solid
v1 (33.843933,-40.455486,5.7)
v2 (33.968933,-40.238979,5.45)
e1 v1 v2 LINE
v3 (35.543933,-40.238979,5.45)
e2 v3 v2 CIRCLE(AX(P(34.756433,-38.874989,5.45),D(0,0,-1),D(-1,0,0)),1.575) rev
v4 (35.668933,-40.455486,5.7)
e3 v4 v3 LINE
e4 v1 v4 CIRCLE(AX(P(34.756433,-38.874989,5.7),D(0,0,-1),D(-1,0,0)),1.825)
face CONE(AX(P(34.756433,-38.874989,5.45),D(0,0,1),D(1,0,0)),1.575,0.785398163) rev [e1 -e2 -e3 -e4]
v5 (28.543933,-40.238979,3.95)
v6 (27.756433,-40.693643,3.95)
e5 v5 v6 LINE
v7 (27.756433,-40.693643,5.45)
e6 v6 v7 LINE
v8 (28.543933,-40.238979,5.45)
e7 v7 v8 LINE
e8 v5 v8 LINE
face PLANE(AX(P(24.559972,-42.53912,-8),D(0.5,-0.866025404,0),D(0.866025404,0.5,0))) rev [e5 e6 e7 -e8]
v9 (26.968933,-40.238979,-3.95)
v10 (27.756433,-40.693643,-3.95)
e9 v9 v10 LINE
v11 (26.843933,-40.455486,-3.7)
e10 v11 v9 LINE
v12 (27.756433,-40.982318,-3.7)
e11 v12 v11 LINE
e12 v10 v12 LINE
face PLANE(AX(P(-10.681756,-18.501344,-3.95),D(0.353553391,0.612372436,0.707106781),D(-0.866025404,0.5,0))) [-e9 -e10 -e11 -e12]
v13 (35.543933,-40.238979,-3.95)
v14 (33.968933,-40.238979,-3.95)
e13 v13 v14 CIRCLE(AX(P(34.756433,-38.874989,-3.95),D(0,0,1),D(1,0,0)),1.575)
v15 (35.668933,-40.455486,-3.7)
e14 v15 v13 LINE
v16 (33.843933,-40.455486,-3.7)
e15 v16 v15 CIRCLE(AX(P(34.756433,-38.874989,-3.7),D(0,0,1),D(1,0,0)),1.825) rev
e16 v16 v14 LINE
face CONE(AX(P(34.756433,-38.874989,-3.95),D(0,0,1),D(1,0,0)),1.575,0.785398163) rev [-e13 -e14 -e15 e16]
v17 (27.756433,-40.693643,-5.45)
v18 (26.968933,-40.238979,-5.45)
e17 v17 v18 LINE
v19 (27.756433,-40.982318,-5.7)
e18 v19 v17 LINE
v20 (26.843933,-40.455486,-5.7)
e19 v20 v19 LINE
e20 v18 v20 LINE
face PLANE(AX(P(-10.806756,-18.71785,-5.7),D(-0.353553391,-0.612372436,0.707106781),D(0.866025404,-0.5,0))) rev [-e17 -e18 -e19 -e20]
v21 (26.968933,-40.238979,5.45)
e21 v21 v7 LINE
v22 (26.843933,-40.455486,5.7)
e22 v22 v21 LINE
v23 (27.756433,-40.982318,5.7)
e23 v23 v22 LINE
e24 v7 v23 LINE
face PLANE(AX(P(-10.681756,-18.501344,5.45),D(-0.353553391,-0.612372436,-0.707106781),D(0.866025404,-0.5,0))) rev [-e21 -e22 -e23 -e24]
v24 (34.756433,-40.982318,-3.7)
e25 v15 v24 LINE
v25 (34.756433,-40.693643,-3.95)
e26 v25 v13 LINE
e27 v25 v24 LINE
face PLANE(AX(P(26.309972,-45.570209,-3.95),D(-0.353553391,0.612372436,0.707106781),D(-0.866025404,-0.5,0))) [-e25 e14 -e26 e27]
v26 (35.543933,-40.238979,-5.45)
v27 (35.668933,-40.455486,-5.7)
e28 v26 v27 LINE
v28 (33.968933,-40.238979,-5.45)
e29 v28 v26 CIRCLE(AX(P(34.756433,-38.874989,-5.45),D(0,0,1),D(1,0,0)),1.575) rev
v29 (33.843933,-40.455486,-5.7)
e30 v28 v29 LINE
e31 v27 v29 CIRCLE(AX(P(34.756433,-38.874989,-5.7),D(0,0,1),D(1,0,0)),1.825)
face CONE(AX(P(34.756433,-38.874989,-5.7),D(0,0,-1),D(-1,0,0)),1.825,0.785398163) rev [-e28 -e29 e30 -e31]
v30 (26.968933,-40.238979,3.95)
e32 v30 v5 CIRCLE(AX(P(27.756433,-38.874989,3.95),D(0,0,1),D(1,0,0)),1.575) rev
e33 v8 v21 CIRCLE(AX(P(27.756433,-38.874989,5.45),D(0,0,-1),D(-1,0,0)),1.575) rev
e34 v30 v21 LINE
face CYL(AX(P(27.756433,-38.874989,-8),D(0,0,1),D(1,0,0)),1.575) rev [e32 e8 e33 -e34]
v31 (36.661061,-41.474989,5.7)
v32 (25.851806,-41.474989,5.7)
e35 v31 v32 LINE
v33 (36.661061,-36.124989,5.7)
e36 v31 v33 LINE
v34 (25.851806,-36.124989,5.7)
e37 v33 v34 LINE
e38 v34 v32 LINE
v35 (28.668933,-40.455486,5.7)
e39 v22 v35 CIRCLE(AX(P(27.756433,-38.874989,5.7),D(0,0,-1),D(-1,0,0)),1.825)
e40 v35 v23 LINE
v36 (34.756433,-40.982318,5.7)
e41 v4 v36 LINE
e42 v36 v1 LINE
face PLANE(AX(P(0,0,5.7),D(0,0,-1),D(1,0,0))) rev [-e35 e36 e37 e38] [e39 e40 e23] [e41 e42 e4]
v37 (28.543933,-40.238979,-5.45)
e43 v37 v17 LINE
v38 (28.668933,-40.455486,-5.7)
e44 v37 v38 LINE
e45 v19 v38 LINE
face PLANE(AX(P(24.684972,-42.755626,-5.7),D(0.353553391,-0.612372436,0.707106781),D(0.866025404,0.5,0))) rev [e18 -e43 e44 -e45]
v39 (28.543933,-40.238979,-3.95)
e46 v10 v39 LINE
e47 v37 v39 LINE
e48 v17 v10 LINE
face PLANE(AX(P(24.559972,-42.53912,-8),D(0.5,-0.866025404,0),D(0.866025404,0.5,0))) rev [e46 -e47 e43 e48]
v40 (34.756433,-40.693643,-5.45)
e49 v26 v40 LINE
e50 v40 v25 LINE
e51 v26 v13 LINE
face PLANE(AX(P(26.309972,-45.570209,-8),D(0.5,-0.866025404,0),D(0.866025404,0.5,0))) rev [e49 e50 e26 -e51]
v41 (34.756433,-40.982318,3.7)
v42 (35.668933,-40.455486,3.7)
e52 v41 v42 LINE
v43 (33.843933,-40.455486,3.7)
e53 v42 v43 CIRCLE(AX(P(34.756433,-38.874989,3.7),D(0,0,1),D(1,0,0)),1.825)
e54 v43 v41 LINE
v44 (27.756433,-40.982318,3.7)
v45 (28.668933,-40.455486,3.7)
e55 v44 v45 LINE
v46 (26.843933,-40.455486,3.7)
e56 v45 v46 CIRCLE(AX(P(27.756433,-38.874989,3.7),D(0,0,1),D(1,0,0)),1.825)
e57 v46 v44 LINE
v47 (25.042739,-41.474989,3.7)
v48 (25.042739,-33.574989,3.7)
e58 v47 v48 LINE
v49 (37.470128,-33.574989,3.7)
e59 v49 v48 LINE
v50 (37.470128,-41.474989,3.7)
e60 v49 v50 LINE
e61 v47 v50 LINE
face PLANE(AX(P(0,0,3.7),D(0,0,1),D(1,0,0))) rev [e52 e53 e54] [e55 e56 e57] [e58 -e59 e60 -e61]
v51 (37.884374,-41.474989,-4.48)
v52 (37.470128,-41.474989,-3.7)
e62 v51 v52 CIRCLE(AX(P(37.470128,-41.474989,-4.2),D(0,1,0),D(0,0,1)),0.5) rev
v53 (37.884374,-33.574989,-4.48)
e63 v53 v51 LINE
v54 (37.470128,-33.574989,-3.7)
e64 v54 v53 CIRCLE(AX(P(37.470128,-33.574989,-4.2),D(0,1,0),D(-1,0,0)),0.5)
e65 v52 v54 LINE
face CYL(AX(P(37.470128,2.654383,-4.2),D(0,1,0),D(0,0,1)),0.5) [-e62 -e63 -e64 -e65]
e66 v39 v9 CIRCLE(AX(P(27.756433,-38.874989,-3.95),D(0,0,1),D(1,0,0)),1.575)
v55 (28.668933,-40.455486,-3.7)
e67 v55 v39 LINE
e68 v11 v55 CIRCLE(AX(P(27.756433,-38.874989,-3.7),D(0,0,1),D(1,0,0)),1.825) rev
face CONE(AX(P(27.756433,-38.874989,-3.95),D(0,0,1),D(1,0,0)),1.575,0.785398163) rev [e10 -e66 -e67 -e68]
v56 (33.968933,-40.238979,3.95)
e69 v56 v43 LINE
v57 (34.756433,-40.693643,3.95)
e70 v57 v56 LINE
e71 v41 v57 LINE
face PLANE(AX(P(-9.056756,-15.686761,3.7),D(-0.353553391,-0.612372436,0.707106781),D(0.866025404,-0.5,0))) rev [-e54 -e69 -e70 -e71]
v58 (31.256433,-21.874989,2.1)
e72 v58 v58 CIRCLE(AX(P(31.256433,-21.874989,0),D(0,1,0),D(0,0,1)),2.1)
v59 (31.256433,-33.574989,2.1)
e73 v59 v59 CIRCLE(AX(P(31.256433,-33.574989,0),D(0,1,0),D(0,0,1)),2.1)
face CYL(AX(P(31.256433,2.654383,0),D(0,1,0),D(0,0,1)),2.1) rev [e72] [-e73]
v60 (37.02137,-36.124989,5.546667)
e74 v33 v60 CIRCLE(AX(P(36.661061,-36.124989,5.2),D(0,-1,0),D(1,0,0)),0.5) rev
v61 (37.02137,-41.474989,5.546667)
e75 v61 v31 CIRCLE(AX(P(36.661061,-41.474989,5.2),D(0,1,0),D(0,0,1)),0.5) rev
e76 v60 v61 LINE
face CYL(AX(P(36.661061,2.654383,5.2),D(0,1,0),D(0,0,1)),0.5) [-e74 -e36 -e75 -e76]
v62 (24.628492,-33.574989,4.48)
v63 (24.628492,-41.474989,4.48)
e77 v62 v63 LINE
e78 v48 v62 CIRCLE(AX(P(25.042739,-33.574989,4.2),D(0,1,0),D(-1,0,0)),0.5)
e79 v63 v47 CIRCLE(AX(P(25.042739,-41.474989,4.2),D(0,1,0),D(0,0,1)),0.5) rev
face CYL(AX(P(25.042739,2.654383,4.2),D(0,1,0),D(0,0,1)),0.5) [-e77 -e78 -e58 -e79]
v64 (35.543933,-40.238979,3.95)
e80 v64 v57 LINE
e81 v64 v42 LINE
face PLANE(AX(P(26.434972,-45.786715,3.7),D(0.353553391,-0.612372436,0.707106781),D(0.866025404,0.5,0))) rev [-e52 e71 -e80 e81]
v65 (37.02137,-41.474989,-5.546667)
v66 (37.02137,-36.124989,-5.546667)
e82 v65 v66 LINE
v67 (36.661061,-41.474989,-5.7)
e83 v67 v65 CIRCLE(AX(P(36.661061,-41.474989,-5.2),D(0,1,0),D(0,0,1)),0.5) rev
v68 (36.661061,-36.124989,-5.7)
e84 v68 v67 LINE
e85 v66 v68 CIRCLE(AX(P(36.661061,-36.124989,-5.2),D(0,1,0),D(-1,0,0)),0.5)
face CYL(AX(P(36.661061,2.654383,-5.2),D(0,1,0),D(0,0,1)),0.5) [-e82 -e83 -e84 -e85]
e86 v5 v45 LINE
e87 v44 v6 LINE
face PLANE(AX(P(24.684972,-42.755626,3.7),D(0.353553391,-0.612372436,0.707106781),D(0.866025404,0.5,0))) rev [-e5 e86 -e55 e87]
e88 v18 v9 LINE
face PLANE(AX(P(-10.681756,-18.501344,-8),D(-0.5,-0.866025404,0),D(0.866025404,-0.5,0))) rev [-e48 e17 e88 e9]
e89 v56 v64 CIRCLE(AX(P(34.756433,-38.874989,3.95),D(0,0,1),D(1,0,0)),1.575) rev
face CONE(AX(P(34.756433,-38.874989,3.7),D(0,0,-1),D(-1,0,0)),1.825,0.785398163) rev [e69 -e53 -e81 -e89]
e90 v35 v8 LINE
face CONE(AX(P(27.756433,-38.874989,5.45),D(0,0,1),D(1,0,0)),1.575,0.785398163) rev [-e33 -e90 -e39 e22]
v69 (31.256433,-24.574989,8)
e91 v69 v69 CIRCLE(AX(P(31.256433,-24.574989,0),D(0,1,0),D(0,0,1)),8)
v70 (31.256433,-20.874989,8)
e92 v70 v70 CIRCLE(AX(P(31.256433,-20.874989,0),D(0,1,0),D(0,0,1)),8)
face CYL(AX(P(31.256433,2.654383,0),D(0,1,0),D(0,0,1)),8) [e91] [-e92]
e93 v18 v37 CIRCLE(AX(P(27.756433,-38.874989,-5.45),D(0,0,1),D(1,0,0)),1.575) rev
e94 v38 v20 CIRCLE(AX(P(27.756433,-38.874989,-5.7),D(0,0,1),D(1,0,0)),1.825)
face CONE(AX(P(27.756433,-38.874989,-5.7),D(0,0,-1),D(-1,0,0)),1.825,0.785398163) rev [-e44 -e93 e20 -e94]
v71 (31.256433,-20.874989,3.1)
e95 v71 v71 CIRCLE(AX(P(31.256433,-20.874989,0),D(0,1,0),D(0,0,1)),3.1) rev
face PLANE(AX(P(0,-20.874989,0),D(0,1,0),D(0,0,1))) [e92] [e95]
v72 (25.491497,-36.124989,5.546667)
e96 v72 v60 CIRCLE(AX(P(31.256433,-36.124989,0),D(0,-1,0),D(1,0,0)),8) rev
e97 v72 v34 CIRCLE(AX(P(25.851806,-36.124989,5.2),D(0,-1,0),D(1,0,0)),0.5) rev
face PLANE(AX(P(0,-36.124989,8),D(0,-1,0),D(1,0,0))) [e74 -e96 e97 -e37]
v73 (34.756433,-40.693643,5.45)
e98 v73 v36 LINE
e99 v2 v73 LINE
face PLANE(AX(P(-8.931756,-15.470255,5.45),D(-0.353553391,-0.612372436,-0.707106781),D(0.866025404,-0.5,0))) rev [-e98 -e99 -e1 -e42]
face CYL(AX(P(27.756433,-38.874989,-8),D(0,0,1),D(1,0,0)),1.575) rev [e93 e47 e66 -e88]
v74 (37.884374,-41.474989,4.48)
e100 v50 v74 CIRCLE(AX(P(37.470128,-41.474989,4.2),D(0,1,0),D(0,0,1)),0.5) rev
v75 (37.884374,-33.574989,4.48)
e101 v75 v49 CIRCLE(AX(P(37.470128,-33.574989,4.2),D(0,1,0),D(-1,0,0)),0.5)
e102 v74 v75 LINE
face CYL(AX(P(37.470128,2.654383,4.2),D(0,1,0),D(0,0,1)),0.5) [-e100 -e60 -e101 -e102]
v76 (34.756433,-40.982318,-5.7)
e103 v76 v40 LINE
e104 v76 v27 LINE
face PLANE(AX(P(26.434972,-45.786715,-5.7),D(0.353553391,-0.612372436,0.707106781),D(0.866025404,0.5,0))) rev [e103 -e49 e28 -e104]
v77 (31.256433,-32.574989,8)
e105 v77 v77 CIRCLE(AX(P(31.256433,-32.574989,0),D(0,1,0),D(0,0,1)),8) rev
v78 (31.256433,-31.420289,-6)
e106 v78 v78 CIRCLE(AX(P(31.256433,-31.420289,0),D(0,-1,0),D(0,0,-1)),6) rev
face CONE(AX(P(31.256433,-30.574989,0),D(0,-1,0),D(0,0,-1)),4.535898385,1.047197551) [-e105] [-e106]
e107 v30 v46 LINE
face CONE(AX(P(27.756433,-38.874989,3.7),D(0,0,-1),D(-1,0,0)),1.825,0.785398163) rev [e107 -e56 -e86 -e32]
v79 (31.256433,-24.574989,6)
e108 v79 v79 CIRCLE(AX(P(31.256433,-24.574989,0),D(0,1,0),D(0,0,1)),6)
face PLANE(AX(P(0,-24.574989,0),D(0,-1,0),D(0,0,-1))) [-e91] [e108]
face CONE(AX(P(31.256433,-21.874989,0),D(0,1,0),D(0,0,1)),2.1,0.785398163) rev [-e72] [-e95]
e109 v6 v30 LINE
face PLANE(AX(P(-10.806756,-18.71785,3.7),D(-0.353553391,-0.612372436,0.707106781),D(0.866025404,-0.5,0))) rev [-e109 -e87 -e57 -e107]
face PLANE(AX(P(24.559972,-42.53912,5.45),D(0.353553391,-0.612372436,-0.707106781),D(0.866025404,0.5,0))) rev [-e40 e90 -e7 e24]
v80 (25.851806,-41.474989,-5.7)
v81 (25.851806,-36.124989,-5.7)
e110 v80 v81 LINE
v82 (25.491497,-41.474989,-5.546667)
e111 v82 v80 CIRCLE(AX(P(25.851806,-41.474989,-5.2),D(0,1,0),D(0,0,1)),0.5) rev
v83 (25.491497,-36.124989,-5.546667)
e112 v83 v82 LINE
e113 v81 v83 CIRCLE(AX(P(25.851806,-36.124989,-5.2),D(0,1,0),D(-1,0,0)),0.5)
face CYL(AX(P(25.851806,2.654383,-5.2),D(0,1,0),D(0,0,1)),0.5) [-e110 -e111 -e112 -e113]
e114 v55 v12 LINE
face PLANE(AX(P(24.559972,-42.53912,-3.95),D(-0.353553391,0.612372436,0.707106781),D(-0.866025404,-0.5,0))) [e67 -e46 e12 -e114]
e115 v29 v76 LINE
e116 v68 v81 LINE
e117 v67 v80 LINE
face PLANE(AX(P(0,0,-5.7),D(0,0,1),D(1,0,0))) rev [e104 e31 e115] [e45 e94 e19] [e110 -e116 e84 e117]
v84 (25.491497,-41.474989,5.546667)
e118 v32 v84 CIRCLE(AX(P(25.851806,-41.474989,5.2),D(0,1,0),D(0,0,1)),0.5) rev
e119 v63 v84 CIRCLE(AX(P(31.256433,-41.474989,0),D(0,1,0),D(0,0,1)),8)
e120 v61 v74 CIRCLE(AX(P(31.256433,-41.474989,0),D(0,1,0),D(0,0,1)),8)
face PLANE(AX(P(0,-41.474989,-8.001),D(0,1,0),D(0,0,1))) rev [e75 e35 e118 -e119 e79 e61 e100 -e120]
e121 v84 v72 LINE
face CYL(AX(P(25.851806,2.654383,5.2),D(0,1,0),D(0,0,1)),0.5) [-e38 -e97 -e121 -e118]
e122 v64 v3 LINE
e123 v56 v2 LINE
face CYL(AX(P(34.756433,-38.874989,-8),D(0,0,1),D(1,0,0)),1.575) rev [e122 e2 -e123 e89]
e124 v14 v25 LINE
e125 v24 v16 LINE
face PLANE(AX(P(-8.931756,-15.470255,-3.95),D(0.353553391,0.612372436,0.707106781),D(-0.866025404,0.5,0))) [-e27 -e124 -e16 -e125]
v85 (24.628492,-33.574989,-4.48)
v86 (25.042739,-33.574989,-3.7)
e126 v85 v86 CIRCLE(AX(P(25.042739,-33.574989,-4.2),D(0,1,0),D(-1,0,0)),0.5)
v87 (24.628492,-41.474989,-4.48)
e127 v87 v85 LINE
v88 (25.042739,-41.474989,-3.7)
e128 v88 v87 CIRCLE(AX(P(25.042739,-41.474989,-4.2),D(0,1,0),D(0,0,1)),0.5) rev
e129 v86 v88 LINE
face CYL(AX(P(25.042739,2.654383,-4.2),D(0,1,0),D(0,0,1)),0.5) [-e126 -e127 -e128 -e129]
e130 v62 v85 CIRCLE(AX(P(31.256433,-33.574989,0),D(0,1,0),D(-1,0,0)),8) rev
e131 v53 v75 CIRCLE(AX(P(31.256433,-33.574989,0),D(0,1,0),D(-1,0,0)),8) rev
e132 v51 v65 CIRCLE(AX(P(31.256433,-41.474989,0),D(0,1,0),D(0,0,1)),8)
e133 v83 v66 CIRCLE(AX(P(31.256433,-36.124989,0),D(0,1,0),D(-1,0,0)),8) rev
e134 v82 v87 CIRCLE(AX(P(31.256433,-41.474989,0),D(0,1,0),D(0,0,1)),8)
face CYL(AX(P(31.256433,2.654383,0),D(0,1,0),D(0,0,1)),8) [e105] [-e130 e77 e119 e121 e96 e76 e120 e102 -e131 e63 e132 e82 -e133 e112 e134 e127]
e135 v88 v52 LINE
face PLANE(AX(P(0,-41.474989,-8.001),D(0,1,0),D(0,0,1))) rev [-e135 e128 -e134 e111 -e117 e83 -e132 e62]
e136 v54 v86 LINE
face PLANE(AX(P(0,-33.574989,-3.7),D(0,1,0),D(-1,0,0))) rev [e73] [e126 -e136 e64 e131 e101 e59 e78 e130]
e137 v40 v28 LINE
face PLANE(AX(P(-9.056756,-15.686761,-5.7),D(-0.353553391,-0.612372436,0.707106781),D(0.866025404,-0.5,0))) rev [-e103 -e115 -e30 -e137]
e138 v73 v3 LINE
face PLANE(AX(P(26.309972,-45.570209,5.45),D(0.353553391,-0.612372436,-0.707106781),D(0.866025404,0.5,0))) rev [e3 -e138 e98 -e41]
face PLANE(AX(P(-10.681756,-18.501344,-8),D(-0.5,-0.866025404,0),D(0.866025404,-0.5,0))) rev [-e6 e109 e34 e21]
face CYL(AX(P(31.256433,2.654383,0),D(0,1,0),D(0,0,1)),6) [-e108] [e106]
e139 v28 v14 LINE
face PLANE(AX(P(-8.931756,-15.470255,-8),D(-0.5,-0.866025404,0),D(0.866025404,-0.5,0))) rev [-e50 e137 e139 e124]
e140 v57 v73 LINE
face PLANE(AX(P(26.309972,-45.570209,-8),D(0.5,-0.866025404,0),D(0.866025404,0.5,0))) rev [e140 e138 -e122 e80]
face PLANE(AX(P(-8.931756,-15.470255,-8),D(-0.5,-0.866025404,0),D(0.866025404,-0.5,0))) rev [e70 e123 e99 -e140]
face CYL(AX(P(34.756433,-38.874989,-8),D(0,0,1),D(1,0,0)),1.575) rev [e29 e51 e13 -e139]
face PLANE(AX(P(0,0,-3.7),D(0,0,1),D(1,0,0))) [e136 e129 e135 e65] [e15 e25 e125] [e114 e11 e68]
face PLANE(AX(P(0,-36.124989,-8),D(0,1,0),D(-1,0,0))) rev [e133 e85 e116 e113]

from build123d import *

# Parameters (mm, degrees)
CHAMFER1_SIZE           = 3.464101615
CHAMFER1_SIZE_2         = 2
CHAMFER3_SIZE           = 1
BOSS_EXTRUDE1_START     = -41.474989169
BOSS_EXTRUDE1_OUTLINE_R = 8
BOSS_EXTRUDE1_DEPTH     = 7.9
SKETCH1_4_R             = 1.5749999999999995
CUT_EXTRUDE1_DEPTH      = 3.7
CUT_EXTRUDE3_DEPTH      = 58.66491382432064
CUT_EXTRUDE3_DEPTH_BACK = 58.66491382432064
SKETCH1_6_R             = 1.5749999999999995
CUT_EXTRUDE2_START      = -5.7
CUT_EXTRUDE2_DEPTH      = 52.964913909989384
FILLET2_R               = 0.5
CHAMFER4_SIZE           = 0.25


# Read off the part's stored shape, not the designer's step: Boss-Extrude1
with BuildPart() as part:
    # Sketch1 → Revolve1 (revolve)
    with BuildSketch(Plane.XY, mode=Mode.PRIVATE) as revolve1_sk:
        Polygon((33.35643335515833, -33.57498916935771), (33.35643335515833, -20.874989169357704), (39.256433355158336, -20.87498916935769), (39.256433355158336, -24.574989169357693), (37.25643335515833, -24.574989169357696), (37.256433355158336, -30.5749891693577), (39.256433355158336, -30.5749891693577), (39.256433355158336, -33.5749891693577), align=None)
    revolve(revolve1_sk.sketch.rotate(Axis((31.256433355158332, 2.6543833262093552, 0), (0, -1, 0)), 90), axis=Axis((31.256433355158332, 2.6543833262093552, 0), (0, -1, 0)))

    # Chamfer1
    # the kernel refuses this chamfer: 3.464101615, 2 mm, written as the material it takes off along each edge
    with BuildSketch(Plane(origin=(31.256433355158332, -30.5749891693577, 0), x_dir=(0, 0, 1), z_dir=(1, 0, 0))) as chamfer1_piece_1_section:
        Polygon((8.000000000000004 - CHAMFER1_SIZE, 0), (8.000000000000004, CHAMFER1_SIZE_2), (8.000000000000004, 0), align=None)
    chamfer1_piece_1 = revolve(axis=Axis((31.256433355158332, -30.5749891693577, 0), (0, -1, 0)), mode=Mode.PRIVATE)
    chamfer1_piece_1 = chamfer1_piece_1 - Plane(origin=(31.256433355158332, -31.987048934544962, 0), x_dir=(0, 0, 1), z_dir=(0, -1, 0)) * Cylinder(5.9999999999999964, 33, mode=Mode.PRIVATE)
    add(chamfer1_piece_1, mode=Mode.SUBTRACT)

    # Chamfer3
    chamfer3_edges = [part.edges().sort_by_distance(p)[0] for p in [
        (31.256433355158332, -20.874989169357704, -2.099999999999998),
    ]]
    chamfer(chamfer3_edges, length=CHAMFER3_SIZE)

    # Boss-Extrude1 outline → Boss-Extrude1 (add)
    with BuildSketch(Plane(origin=(0, 0, 0), x_dir=(1, 0, 0), z_dir=(0, 1, 0)).offset(BOSS_EXTRUDE1_START)):
        with Locations((31.256433355, 0)):
            Circle(BOSS_EXTRUDE1_OUTLINE_R)
    extrude(amount=BOSS_EXTRUDE1_DEPTH)

    # Sketch1<4> → Cut-Extrude1 (cut, symmetric)
    # profile 1 of 7: a face of its own
    with BuildSketch(Plane.XY):
        Polygon((39.25643335515834, -41.47498916935769), (39.25643335515834, -36.1249891693577), (23.256433355158325, -36.12498916935768), (23.256433355158325, -41.47498916935769), align=None)
        with BuildLine():
            Line((27.75643335515833, -40.69364251730501), (26.968933355158327, -40.23897918031817))
            ThreePointArc((26.968933355158327, -40.23897918031817), (26.96893335515834, -37.51099915839719), (29.331433355158335, -38.87498916935768))
            ThreePointArc((29.331433355158335, -38.87498916935768), (29.120423366118825, -39.662489169357684), (28.543933355158334, -40.238979180318175))
            Line((28.543933355158334, -40.238979180318175), (27.75643335515833, -40.69364251730501))
        make_face(mode=Mode.SUBTRACT)
        with BuildLine():
            Line((34.75643335515833, -40.69364251730501), (33.968933355158335, -40.238979180318175))
            ThreePointArc((33.968933355158335, -40.238979180318175), (33.96893335515833, -37.5109991583972), (36.33143335515833, -38.87498916935768))
            ThreePointArc((36.33143335515833, -38.87498916935768), (36.12042336611882, -39.662489169357684), (35.54393335515832, -40.238979180318175))
            Line((35.54393335515833, -40.23897918031818), (34.75643335515833, -40.69364251730501))
        make_face(mode=Mode.SUBTRACT)
    # profile 2 of 7: a face of its own
    with BuildSketch(Plane.XY):
        with Locations((27.756433355158336, -38.87498916935768)):
            Circle(SKETCH1_4_R)
    # profile 3 of 7: a face of its own
    with BuildSketch(Plane.XY):
        with Locations((34.75643335515833, -38.87498916935768)):
            Circle(SKETCH1_4_R)
    # profile 4 of 7: a face of its own
    with BuildSketch(Plane.XY):
        with BuildLine():
            ThreePointArc((35.54393335515832, -40.238979180318175), (34.75643335515833, -40.449989169357686), (33.968933355158335, -40.238979180318175))
            Line((33.968933355158335, -40.238979180318175), (34.75643335515833, -40.69364251730501))
            Line((34.75643335515833, -40.69364251730501), (35.54393335515833, -40.23897918031818))
        make_face()
    # profile 5 of 7: a face of its own
    with BuildSketch(Plane.XY):
        with BuildLine():
            ThreePointArc((28.543933355158334, -40.238979180318175), (27.75643335515833, -40.449989169357686), (26.968933355158327, -40.23897918031817))
            Line((26.968933355158327, -40.23897918031817), (27.75643335515833, -40.69364251730501))
            Line((27.75643335515833, -40.69364251730501), (28.543933355158334, -40.238979180318175))
        make_face()
    # profile 6 of 7: a face of its own
    with BuildSketch(Plane.XY):
        Polygon((33.35643335515833, -33.57498916935771), (23.256433355158332, -33.5749891693577), (23.256433355158325, -35.87498916935769), (39.25643335515834, -35.87498916935769), (39.256433355158336, -33.5749891693577), align=None)
    # profile 7 of 7: a face of its own
    with BuildSketch(Plane.XY):
        Polygon((39.25643335515834, -36.1249891693577), (39.25643335515834, -35.87498916935769), (23.256433355158325, -35.87498916935769), (23.256433355158325, -36.12498916935768), align=None)
    extrude(amount=CUT_EXTRUDE1_DEPTH, both=True, mode=Mode.SUBTRACT)

    # Sketch1<6> → Cut-Extrude3 (cut, two sides: drawn at the far end of the back side and taken through both)
    with BuildSketch(Plane.XY.offset(-CUT_EXTRUDE3_DEPTH_BACK)):
        with Locations((27.756433355158336, -38.87498916935768)):
            Circle(SKETCH1_6_R)
        with BuildLine():
            ThreePointArc((28.543933355158334, -40.238979180318175), (27.75643335515833, -40.449989169357686), (26.968933355158327, -40.23897918031817))
            Line((26.968933355158327, -40.23897918031817), (27.75643335515833, -40.69364251730501))
            Line((27.75643335515833, -40.69364251730501), (28.543933355158334, -40.238979180318175))
        make_face()
        with BuildLine():
            ThreePointArc((35.54393335515832, -40.238979180318175), (34.75643335515833, -40.449989169357686), (33.968933355158335, -40.238979180318175))
            Line((33.968933355158335, -40.238979180318175), (34.75643335515833, -40.69364251730501))
            Line((34.75643335515833, -40.69364251730501), (35.54393335515833, -40.23897918031818))
        make_face()
        with Locations((34.75643335515833, -38.87498916935768)):
            Circle(SKETCH1_6_R)
    extrude(amount=CUT_EXTRUDE3_DEPTH + CUT_EXTRUDE3_DEPTH_BACK, mode=Mode.SUBTRACT)

    # Sketch1<5> → Cut-Extrude2 (cut, through all)
    with BuildSketch(Plane.XY.offset(CUT_EXTRUDE2_START)):
        Polygon((39.25643335515834, -41.47498916935769), (39.25643335515834, -36.1249891693577), (23.256433355158325, -36.12498916935768), (23.256433355158325, -41.47498916935769), align=None)
        with BuildLine():
            Line((27.75643335515833, -40.69364251730501), (26.968933355158327, -40.23897918031817))
            ThreePointArc((26.968933355158327, -40.23897918031817), (26.96893335515834, -37.51099915839719), (29.331433355158335, -38.87498916935768))
            ThreePointArc((29.331433355158335, -38.87498916935768), (29.120423366118825, -39.662489169357684), (28.543933355158334, -40.238979180318175))
            Line((28.543933355158334, -40.238979180318175), (27.75643335515833, -40.69364251730501))
        make_face(mode=Mode.SUBTRACT)
        with BuildLine():
            Line((34.75643335515833, -40.69364251730501), (33.968933355158335, -40.238979180318175))
            ThreePointArc((33.968933355158335, -40.238979180318175), (33.96893335515833, -37.5109991583972), (36.33143335515833, -38.87498916935768))
            ThreePointArc((36.33143335515833, -38.87498916935768), (36.12042336611882, -39.662489169357684), (35.54393335515832, -40.238979180318175))
            Line((35.54393335515833, -40.23897918031818), (34.75643335515833, -40.69364251730501))
        make_face(mode=Mode.SUBTRACT)
    cut_extrude2 = extrude(amount=-CUT_EXTRUDE2_DEPTH, mode=Mode.SUBTRACT)

    # Mirror2: Cut-Extrude2 across plane
    add(cut_extrude2.mirror(Plane.XY), mode=Mode.SUBTRACT)

    # Fillet2
    # the kernel refuses this fillet: 0.5 mm, written as the material it takes off along each edge
    with BuildSketch(Plane(origin=(36.86981023527447, -36.1249891693577, -5.7), x_dir=(0.7029804888308749, 0, 0.7112091340267671), z_dir=(0, -1, 0))) as fillet2_piece_1:
        with BuildLine():
            CenterArc((0.2088579287890988, 0.4999546060201171), FILLET2_R, 224.66662086027418, 46.10544623611554)
            Line((-0.14674663822282122, 0.14846436160319898), (0, 0))
            ThreePointArc((0, 0), (0.10779764066534617, -0.00072630367813129), (0.21559528133068703, -1e-17))
        make_face()
    extrude(amount=5.888988203147861, mode=Mode.SUBTRACT)
    with BuildSketch(Plane(origin=(25.643056474725523, -36.12498916935768, -5.7), x_dir=(-0.702980488830873, 0, 0.7112091340267691), z_dir=(0, -1, 0))) as fillet2_piece_2:
        with BuildLine():
            CenterArc((0.20885792878910586, -0.49995460602011715), FILLET2_R, 89.22793290361042, 46.10544623611679)
            Line((-0.14674663822282266, -0.14846436160320758), (0, 0))
            ThreePointArc((0, 0), (0.10779764066534558, 0.00072630367812718), (0.21559528133069272, 1e-17))
        make_face()
    extrude(amount=5.888988203147889, mode=Mode.SUBTRACT)
    with BuildSketch(Plane(origin=(25.643056474725523, -36.12498916935768, 5.7), x_dir=(1, 0, 0), z_dir=(0, -1, 0))) as fillet2_piece_3:
        with BuildLine():
            CenterArc((0.20874923352183217, -0.5), FILLET2_R, 90, 46.10544623635468)
            ThreePointArc((-0.15155927626154408, -0.1533333333334701), (-0.07629619193971493, -0.07615608935305396), (0, 0))
            Line((0, 0), (0.20874923352183217, 0))
        make_face()
    extrude(amount=5.888988203147981, mode=Mode.SUBTRACT)
    with BuildSketch(Plane(origin=(36.86981023527447, -36.1249891693577, 5.7), x_dir=(-1, 0, 0), z_dir=(0, -1, 0))) as fillet2_piece_4:
        with BuildLine():
            CenterArc((0.2087492335218215, 0.5), FILLET2_R, 223.8945537636461, 46.10544623635394)
            ThreePointArc((-0.1515592762615512, 0.15333333333346388), (-0.07629619193971138, 0.07615608935304952), (0, 0))
            Line((0, 0), (0.2087492335218215, 0))
        make_face()
    extrude(amount=5.888988203147967, mode=Mode.SUBTRACT)
    with BuildSketch(Plane(origin=(38.34938760552213, -33.5749891693577, 3.7), x_dir=(-1, 0, 0), z_dir=(0, -1, 0))) as fillet2_piece_5:
        with BuildLine():
            CenterArc((0.8792596973597355, -0.5), FILLET2_R, 90, 124.05579774256802)
            ThreePointArc((0.4650133938155747, -0.780000000000002), (0.22143035578866233, -0.3966033935575206), (0, 0))
            Line((0, 0), (0.8792596973597355, 0))
        make_face()
    extrude(amount=10.170238776398236, mode=Mode.SUBTRACT)
    with BuildSketch(Plane(origin=(24.163479104477865, -33.5749891693577, 3.7), x_dir=(1, 0, 0), z_dir=(0, -1, 0))) as fillet2_piece_6:
        with BuildLine():
            CenterArc((0.8792596973597426, 0.5), FILLET2_R, 145.94420225743224, 124.05579774256776)
            ThreePointArc((0.4650133938155818, 0.7799999999999994), (0.22143035578866233, 0.3966033935575153), (0, 0))
            Line((0, 0), (0.8792596973597426, 0))
        make_face()
    extrude(amount=10.170238776398243, mode=Mode.SUBTRACT)
    with BuildSketch(Plane(origin=(38.34938760552213, -33.5749891693577, -3.7), x_dir=(-0.512075424194691, 0, -0.858940486841683), z_dir=(0, -1, 0))) as fillet2_piece_7:
        with BuildLine():
            CenterArc((0.8797175259236281, -0.4991940404131022), FILLET2_R, 86.74637410845834, 124.05579774256779)
            Line((0.4502472825027866, -0.7552317525104477), (0, 0))
            ThreePointArc((0, 0), (0.4540477553154187, 0.01289535339037927), (0.9080955106308399, 1e-17))
        make_face()
    extrude(amount=10.170238776398243, mode=Mode.SUBTRACT)
    with BuildSketch(Plane(origin=(24.163479104477865, -33.5749891693577, -3.7), x_dir=(0.512075424194691, 0, -0.858940486841683), z_dir=(0, -1, 0))) as fillet2_piece_8:
        with BuildLine():
            CenterArc((0.8797175259236281, 0.4991940404131022), FILLET2_R, 149.1978281489743, 124.05579774256734)
            Line((0.4502472825027848, 0.7552317525104447), (0, 0))
            ThreePointArc((0, 0), (0.4540477553154179, -0.01289535339037882), (0.9080955106308399, -1e-17))
        make_face()
    extrude(amount=10.170238776398243, mode=Mode.SUBTRACT)

    # Chamfer4
    chamfer4_edges = [part.edges().sort_by_distance(p)[0] for p in [
        (34.36268335515833, -40.46631084881159, -3.7),
        (34.75643335515833, -37.29998916935768, -3.7),
        (27.75643335515833, -37.29998916935768, -5.7),
        (27.362683355158328, -40.46631084881159, -5.7),
        (34.75643335515834, -37.299989169357694, -5.7),
        (34.36268335515833, -40.46631084881159, -5.7),
        (28.150183355158333, -40.46631084881159, -5.7),
        (35.15018335515833, -40.466310848811595, -5.7),
        (34.75643335515834, -37.2999891693577, 5.7),
        (34.36268335515833, -40.46631084881159, 5.7),
        (35.15018335515833, -40.466310848811595, 5.7),
        (27.75643335515833, -37.29998916935768, 5.7),
        (27.362683355158328, -40.46631084881159, 5.7),
        (28.150183355158333, -40.46631084881159, 5.7),
        (34.75643335515833, -37.29998916935768, 3.7),
        (34.36268335515833, -40.46631084881159, 3.7),
        (35.15018335515833, -40.4663108488116, 3.7000000000000006),
        (27.362683355158328, -40.46631084881159, 3.7),
        (28.15018335515833, -40.46631084881159, 3.7),
        (27.75643335515834, -37.29998916935768, 3.7),
        (27.75643335515834, -37.29998916935768, -3.7),
        (28.15018335515833, -40.46631084881159, -3.7),
        (27.362683355158328, -40.46631084881159, -3.7),
        (35.15018335515833, -40.4663108488116, -3.7000000000000006),
    ]]
    chamfer(chamfer4_edges, length=CHAMFER4_SIZE)


solid = part.part
